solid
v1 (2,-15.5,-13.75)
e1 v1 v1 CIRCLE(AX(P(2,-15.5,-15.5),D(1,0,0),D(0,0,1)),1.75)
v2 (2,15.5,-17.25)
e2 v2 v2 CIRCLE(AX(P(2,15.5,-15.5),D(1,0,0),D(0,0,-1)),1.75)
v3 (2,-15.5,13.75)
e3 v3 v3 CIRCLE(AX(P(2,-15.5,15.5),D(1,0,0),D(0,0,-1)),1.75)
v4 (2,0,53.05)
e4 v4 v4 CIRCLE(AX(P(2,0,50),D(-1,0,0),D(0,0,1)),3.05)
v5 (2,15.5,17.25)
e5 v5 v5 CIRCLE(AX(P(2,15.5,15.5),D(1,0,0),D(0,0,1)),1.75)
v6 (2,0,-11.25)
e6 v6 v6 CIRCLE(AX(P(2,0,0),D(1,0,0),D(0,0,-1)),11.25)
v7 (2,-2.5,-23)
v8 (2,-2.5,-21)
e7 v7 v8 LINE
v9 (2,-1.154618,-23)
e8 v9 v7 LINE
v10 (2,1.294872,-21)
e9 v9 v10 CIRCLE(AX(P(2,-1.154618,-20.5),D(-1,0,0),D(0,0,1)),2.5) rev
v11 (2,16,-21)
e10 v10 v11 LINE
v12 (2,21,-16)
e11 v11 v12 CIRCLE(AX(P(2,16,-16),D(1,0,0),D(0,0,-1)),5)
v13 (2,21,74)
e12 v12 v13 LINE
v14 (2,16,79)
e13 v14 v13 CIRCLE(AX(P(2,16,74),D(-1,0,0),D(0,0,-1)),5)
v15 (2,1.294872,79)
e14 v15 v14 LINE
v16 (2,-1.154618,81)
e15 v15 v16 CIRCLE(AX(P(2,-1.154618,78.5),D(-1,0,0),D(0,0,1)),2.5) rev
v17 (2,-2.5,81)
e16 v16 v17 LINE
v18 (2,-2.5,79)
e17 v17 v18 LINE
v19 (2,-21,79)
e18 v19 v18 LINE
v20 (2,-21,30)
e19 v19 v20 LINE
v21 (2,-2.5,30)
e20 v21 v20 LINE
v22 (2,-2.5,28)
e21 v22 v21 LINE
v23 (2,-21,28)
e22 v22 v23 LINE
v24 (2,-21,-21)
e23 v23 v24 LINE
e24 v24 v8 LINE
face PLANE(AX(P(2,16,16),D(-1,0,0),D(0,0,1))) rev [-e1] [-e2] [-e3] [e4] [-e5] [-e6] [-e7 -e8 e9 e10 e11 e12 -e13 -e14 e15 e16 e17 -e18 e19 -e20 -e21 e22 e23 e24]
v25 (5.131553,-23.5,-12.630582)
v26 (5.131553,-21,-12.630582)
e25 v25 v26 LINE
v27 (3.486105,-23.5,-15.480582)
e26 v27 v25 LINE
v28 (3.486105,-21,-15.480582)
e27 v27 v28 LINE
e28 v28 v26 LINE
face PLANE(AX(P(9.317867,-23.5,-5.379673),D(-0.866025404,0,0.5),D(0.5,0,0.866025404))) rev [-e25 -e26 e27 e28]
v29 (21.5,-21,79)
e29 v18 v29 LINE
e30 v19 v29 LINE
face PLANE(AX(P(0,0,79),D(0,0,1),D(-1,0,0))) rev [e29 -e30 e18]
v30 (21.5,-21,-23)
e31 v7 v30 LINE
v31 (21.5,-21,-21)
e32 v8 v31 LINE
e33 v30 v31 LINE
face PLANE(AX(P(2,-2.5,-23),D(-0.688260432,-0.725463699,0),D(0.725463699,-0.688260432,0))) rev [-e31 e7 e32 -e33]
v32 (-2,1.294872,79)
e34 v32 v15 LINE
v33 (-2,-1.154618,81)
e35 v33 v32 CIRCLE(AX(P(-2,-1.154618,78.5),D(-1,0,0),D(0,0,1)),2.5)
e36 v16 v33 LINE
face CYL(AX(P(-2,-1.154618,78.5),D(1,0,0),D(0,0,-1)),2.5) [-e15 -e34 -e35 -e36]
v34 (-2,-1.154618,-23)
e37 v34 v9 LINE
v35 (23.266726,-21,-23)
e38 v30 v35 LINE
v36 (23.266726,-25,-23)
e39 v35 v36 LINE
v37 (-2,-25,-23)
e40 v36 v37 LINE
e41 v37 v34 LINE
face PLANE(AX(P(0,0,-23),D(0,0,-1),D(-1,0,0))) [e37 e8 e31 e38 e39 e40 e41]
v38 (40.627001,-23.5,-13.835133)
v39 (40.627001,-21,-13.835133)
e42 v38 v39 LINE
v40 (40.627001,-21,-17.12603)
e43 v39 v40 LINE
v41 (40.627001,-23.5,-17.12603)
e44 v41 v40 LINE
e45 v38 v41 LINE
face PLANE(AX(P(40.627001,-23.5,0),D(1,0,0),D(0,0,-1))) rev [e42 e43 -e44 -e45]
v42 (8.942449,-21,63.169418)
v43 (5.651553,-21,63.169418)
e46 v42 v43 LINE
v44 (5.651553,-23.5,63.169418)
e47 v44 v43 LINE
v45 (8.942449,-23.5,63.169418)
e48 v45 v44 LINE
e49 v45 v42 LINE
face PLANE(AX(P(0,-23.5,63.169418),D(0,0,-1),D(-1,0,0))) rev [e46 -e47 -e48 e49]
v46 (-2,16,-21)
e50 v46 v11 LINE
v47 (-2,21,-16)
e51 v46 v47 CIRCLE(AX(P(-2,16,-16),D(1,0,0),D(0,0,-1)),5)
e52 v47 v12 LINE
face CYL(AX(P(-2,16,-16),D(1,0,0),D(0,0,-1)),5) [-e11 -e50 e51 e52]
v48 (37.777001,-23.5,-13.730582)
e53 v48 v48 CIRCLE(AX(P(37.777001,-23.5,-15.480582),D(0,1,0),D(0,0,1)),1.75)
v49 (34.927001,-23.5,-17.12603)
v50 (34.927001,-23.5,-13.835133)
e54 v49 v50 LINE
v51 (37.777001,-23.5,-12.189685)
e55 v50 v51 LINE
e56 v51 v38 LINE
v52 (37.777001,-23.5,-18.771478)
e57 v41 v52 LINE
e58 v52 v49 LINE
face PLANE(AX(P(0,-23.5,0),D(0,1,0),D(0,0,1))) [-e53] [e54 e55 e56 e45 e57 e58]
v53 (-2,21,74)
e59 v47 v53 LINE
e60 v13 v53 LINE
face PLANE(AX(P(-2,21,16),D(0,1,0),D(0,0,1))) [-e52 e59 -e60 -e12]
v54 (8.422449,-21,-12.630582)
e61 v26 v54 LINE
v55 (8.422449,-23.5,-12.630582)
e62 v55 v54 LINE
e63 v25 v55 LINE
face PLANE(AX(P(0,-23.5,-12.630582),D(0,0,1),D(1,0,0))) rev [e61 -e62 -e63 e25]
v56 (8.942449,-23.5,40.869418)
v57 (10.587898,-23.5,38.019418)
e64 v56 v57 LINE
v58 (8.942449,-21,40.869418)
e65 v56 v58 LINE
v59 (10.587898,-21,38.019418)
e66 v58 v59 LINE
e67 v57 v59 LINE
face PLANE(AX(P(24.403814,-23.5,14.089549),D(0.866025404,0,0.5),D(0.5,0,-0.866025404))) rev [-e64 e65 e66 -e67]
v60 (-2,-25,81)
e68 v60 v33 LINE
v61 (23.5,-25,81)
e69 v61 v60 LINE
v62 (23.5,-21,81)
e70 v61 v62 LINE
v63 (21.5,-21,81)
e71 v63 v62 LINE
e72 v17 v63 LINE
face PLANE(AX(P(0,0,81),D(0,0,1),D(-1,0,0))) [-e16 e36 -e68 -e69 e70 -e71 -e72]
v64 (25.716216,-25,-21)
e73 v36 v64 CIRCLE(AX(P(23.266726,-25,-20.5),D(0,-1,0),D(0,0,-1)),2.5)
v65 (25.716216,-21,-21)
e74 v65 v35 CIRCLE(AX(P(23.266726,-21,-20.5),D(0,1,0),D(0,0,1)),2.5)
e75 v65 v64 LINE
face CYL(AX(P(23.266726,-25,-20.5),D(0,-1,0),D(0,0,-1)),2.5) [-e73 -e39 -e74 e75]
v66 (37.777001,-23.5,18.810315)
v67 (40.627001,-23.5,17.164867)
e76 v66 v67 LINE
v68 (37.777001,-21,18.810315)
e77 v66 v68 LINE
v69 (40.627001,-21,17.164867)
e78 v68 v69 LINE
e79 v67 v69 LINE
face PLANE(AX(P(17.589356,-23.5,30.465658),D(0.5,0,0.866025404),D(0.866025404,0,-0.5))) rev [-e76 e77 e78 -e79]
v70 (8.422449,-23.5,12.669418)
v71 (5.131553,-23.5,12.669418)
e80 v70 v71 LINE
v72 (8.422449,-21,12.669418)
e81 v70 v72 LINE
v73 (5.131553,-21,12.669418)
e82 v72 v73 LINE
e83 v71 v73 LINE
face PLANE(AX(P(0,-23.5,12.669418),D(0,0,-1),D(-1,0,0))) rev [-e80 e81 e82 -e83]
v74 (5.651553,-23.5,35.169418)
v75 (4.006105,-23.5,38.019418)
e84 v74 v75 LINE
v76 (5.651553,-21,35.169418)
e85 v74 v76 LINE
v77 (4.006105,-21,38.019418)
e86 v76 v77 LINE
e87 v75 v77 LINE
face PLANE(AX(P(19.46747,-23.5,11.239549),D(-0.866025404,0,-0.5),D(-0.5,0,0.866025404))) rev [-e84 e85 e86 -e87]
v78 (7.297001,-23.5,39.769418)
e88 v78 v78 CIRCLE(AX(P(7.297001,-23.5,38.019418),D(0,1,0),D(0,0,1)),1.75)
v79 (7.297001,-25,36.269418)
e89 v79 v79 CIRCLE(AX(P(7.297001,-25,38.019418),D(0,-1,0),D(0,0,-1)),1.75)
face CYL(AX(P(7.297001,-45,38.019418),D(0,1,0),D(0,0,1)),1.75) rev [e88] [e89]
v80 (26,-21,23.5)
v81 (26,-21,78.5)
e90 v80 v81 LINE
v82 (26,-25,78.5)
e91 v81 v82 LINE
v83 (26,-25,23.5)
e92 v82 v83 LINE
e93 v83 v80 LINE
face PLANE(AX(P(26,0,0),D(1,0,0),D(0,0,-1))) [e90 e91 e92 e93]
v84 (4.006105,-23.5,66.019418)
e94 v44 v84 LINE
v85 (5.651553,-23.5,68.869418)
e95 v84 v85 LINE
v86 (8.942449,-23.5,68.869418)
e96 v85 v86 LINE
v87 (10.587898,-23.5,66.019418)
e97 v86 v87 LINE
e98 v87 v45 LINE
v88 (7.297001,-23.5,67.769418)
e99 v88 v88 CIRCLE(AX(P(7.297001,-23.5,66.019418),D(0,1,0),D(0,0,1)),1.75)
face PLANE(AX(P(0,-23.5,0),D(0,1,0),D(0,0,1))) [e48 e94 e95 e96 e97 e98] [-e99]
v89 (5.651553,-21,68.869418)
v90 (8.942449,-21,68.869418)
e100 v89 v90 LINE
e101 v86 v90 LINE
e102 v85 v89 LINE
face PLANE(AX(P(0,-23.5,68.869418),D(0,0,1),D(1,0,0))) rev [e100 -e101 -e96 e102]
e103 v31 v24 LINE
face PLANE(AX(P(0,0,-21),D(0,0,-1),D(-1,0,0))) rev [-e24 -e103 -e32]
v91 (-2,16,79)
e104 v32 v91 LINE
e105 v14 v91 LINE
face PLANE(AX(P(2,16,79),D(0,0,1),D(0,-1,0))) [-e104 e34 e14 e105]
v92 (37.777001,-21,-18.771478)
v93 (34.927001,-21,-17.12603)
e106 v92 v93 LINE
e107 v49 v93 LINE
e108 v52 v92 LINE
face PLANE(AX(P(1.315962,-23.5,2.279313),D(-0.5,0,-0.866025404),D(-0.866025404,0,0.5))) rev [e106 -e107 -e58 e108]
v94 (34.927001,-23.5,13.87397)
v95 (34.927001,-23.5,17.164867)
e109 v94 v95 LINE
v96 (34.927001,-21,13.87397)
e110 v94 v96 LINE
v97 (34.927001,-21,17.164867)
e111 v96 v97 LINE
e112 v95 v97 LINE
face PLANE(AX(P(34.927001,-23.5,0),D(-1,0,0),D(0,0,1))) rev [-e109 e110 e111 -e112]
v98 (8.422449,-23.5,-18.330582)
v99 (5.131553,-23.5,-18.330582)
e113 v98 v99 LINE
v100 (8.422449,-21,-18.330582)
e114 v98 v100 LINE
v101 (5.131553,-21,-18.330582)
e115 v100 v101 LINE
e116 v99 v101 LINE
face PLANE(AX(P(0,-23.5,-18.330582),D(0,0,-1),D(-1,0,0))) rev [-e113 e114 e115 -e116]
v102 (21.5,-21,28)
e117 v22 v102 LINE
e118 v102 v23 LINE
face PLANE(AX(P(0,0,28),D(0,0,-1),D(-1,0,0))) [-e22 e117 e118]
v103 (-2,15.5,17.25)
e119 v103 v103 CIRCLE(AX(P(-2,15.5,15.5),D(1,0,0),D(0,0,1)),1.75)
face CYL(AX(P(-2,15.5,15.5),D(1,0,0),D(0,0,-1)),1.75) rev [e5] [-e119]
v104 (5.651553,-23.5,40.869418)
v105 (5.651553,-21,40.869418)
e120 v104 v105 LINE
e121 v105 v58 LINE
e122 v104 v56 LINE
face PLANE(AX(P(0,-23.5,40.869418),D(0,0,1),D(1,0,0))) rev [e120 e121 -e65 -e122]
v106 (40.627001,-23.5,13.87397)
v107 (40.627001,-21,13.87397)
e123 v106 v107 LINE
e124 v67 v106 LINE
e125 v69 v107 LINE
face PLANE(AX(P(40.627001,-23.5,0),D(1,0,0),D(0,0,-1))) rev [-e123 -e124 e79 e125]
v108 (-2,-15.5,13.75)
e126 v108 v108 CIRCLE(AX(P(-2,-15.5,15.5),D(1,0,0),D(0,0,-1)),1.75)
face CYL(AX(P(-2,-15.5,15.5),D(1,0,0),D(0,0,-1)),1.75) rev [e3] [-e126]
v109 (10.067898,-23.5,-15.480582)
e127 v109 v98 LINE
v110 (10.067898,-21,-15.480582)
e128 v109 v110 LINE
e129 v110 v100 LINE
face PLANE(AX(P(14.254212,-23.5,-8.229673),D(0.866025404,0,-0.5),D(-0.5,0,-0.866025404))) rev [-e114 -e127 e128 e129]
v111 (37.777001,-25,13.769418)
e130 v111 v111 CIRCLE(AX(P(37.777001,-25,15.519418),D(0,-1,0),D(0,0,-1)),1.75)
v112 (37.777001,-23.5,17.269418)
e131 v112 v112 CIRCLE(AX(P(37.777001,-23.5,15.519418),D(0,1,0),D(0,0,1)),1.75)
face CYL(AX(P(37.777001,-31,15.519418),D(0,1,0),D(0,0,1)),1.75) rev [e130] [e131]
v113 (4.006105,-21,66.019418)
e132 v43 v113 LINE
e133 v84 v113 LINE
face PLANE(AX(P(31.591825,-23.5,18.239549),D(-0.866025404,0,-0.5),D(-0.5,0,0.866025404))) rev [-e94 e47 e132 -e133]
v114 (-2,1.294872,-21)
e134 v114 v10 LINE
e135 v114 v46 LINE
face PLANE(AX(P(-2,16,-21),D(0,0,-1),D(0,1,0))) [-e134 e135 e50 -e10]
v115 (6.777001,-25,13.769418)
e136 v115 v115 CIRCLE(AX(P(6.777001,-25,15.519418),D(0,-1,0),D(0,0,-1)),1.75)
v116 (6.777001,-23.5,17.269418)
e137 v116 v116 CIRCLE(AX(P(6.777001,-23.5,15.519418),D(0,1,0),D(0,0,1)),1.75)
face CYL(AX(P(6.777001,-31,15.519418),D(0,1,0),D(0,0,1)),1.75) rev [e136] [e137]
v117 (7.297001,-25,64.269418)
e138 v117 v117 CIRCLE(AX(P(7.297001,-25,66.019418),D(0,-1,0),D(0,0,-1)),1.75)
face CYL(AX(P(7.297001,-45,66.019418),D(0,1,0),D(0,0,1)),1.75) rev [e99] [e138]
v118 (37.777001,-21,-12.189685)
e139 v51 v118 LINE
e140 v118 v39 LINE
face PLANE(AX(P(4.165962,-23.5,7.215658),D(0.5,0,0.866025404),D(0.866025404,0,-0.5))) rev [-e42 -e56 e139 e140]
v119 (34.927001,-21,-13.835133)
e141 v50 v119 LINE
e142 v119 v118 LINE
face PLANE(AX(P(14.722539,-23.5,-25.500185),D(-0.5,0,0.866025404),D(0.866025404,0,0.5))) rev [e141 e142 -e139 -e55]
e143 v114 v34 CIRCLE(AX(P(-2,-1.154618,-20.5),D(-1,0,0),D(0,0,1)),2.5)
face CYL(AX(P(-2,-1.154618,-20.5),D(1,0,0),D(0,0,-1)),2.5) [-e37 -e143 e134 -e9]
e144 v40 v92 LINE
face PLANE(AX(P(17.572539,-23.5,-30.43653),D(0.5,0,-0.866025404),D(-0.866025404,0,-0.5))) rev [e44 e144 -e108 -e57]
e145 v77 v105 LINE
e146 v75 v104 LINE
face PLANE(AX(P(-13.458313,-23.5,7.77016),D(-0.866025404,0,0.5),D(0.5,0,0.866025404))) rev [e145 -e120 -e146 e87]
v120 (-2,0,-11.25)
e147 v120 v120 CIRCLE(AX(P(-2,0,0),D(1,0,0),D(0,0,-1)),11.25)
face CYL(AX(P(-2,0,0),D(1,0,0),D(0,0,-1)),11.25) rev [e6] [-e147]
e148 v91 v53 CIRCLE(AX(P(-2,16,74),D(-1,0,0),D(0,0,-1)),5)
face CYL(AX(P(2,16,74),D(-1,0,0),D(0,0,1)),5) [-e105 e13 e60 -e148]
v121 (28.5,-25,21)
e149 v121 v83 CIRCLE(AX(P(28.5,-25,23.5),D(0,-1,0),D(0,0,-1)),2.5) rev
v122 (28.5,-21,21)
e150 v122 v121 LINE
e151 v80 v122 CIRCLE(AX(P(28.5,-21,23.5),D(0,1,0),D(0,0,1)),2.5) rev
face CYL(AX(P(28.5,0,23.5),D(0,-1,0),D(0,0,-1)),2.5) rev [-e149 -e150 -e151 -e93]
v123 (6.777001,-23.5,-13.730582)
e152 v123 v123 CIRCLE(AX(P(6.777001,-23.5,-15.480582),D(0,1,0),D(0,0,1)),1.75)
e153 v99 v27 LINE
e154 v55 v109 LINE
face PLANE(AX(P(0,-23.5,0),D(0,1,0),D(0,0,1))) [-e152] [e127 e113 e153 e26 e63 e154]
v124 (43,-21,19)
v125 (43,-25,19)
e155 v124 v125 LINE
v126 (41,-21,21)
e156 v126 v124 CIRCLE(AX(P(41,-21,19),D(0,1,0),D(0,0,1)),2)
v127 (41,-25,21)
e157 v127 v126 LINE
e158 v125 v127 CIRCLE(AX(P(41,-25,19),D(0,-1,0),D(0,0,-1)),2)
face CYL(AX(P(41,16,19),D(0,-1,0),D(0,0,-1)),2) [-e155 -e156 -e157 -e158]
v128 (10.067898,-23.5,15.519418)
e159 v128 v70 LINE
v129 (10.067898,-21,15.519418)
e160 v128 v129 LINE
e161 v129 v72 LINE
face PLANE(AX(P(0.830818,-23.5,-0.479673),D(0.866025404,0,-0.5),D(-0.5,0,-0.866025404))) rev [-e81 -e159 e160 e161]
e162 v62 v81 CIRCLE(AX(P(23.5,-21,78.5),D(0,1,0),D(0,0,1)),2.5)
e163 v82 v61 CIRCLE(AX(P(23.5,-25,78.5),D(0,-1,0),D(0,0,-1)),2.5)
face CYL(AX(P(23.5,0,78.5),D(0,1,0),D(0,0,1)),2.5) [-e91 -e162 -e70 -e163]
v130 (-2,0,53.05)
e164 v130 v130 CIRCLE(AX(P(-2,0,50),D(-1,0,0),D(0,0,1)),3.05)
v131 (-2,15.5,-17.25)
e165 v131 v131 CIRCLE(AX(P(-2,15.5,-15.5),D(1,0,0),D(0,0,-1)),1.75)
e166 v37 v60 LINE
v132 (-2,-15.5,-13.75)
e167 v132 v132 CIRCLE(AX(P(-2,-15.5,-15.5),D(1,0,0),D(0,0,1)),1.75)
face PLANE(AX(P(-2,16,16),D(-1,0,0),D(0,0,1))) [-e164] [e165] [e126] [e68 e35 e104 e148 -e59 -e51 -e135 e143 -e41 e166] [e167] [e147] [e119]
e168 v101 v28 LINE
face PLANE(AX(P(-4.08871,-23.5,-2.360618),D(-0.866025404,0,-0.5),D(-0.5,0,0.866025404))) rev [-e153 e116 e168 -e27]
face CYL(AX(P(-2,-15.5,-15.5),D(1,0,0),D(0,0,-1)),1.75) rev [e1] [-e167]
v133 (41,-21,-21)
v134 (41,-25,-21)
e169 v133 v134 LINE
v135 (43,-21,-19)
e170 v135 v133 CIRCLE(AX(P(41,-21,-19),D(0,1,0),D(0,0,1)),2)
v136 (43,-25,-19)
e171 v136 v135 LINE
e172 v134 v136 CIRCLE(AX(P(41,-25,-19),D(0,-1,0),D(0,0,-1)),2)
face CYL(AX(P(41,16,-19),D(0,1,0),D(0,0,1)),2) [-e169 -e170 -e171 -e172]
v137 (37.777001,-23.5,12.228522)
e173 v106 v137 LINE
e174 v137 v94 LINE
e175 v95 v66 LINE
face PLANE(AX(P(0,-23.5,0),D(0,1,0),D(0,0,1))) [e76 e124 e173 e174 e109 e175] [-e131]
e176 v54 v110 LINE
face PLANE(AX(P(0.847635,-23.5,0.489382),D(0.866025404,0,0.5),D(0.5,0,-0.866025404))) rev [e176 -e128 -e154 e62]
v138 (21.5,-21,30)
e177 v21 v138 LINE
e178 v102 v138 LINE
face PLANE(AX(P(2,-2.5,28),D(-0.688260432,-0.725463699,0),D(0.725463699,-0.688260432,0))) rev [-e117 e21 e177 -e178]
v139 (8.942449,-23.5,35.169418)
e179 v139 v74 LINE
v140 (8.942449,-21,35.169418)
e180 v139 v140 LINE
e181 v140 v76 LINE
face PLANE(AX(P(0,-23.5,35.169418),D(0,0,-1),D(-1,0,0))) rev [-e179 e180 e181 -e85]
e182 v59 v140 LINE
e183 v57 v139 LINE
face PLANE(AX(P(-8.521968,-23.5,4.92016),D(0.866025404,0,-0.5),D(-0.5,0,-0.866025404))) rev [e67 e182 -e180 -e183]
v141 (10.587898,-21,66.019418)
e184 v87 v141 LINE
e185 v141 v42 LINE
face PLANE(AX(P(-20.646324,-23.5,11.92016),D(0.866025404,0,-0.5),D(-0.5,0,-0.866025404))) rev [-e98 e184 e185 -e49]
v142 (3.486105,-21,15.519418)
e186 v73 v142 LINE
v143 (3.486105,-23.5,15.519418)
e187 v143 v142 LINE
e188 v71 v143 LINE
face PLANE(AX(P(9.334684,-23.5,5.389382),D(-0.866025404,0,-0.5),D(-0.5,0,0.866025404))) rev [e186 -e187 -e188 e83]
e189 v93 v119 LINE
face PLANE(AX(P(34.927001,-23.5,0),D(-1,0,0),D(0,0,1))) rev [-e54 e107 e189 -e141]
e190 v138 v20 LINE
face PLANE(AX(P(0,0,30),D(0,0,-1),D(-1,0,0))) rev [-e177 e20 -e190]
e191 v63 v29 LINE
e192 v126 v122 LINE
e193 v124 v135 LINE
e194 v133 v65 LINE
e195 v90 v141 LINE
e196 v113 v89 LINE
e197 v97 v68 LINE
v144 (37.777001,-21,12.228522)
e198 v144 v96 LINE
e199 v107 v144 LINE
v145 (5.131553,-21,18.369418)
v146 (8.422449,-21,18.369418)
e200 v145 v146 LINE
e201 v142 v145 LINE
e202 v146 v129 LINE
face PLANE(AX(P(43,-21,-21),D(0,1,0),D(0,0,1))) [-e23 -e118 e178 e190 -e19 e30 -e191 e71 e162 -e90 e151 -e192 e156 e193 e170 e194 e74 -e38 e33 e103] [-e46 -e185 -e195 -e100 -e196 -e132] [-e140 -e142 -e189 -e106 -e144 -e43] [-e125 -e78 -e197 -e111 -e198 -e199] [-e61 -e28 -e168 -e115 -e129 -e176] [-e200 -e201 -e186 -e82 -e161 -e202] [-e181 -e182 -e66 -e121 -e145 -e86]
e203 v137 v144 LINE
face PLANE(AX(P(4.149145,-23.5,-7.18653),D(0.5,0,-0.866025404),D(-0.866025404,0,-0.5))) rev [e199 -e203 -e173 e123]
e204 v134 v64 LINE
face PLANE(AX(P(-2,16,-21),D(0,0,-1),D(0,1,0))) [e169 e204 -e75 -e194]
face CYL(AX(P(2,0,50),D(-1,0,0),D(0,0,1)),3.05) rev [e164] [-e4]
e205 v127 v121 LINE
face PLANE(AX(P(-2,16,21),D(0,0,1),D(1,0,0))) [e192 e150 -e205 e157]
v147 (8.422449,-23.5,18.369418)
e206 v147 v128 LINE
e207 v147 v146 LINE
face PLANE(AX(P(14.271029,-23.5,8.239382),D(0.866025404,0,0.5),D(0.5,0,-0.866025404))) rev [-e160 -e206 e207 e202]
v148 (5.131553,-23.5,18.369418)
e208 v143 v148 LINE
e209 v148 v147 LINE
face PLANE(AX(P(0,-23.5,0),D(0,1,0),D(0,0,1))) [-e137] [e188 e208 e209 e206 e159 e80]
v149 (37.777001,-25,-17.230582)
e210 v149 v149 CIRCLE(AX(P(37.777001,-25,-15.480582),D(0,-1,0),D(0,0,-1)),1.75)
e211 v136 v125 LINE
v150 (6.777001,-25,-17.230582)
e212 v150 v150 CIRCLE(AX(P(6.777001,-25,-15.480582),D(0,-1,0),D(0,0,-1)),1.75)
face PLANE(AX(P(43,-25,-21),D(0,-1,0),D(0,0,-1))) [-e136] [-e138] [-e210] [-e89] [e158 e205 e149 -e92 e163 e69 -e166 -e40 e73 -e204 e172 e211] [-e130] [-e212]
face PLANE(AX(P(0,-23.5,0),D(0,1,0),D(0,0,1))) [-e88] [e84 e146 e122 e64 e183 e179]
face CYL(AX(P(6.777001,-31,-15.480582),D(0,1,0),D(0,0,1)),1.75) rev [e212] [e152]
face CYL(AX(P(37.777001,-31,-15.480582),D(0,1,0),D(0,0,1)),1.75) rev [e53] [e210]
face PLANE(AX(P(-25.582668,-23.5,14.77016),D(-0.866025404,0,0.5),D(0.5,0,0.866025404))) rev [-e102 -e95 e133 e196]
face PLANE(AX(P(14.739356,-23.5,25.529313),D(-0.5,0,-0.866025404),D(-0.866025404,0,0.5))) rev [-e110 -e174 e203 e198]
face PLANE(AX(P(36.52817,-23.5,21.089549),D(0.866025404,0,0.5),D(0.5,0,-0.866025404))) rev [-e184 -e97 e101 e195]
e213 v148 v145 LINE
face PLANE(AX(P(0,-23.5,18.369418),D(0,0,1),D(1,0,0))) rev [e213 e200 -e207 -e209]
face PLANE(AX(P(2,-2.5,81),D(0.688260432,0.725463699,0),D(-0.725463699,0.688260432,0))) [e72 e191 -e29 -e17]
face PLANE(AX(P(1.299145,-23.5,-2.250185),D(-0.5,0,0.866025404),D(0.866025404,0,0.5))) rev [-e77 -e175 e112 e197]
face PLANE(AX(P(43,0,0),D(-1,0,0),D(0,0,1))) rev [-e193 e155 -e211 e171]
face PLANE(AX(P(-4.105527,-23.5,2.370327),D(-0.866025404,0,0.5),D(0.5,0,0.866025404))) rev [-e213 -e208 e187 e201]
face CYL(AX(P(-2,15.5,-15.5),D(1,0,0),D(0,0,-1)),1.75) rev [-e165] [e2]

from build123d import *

# Parameters (mm, degrees)
BOSS_EXTRUDE1_DEPTH      = 2
BOSS_EXTRUDE1_DEPTH_BACK = 2
SKETCH1_R                = 1.75
SKETCH1_R_2              = 11.25
SKETCH2_W                = 42
SKETCH2_H                = 4
BOSS_EXTRUDE2_DEPTH      = 45
FILLET4_R                = 2
SKETCH3_R                = 1.75
CUT_EXTRUDE1_DEPTH       = 10
SKETCH3_4_R              = 1.75
CUT_EXTRUDE2_DEPTH       = 2.5
SKETCH10_R               = 3.05
BOSS_EXTRUDE4_DEPTH      = 4
SKETCH11_W               = 58
SKETCH11_H               = 4
BOSS_EXTRUDE5_DEPTH      = 24
SKETCH12_R               = 1.75
CUT_EXTRUDE3_DEPTH       = 24
SKETCH12_3_R             = 1.75
CUT_EXTRUDE4_DEPTH       = 2.5
FILLET5_R                = 2.5
BOSS_EXTRUDE6_DEPTH      = 2
LPATTERN1_COUNT          = 2
LPATTERN1_PITCH          = 51
FILLET6_R                = 2.5
FILLET7_R                = 2.5
FILLET7_OF_MIRROR3_R     = 2.5
SKETCH15_W               = 3.203134656
SKETCH15_H               = 5.191613013
BOSS_EXTRUDE7_DEPTH      = 4
FILLET8_R                = 2.5


with BuildPart() as part:
    # Sketch1 → Boss-Extrude1 (new, two sides: drawn at the far end of the back side and taken through both)
    with BuildSketch(Plane(origin=(0, 0, 0), x_dir=(0, 0, -1), z_dir=(1, 0, 0)).offset(-BOSS_EXTRUDE1_DEPTH_BACK)):
        with BuildLine():
            Line((-16, 21), (16, 21))
            ThreePointArc((16, 21), (19.535533906, 19.535533906), (21, 16))
            Line((21, 16), (21, -21))
            Line((21, -21), (-21, -21))
            Line((-21, -21), (-21, 16))
            ThreePointArc((-21, 16), (-19.535533906, 19.535533906), (-16, 21))
        make_face()
        with Locations((15.5, 15.5)):
            Circle(SKETCH1_R, mode=Mode.SUBTRACT)
        with Locations(Location((-15.5, 15.5, 0), (0, 0, 180))):
            Circle(SKETCH1_R, mode=Mode.SUBTRACT)
        with Locations(Location((15.5, -15.5, 0), (0, 0, 180))):
            Circle(SKETCH1_R, mode=Mode.SUBTRACT)
        with Locations((-15.5, -15.5)):
            Circle(SKETCH1_R, mode=Mode.SUBTRACT)
        Circle(SKETCH1_R_2, mode=Mode.SUBTRACT)
    extrude(amount=BOSS_EXTRUDE1_DEPTH + BOSS_EXTRUDE1_DEPTH_BACK)

    # Sketch2 → Boss-Extrude2 (add)
    with BuildSketch(Plane.ZY.offset(2)):
        with Locations((0, -23)):
            Rectangle(SKETCH2_W, SKETCH2_H)
    extrude(amount=-BOSS_EXTRUDE2_DEPTH)

    # Fillet4
    fillet4_edges = [part.edges().sort_by_distance(p)[0] for p in [
        (43, -23, -21),
        (43, -23, 21),
    ]]
    fillet(fillet4_edges, radius=FILLET4_R)

    # Sketch3 → Cut-Extrude1 (cut)
    with BuildSketch(Plane(origin=(0, -21, 0), x_dir=(1, 0, 0), z_dir=(0, 1, 0))):
        with Locations(Location((37.777001089, 15.480581557, 0), (0, 0, 270))):
            Circle(SKETCH3_R)
        with Locations(Location((37.777001089, -15.519418443, 0), (0, 0, 270))):
            Circle(SKETCH3_R)
        with Locations(Location((6.777001089, -15.519418443, 0), (0, 0, 270))):
            Circle(SKETCH3_R)
        with Locations(Location((6.777001089, 15.480581557, 0), (0, 0, 270))):
            Circle(SKETCH3_R)
    extrude(amount=-CUT_EXTRUDE1_DEPTH, mode=Mode.SUBTRACT)

    # Sketch3<4> → Cut-Extrude2 (cut)
    # profile 1 of 4: a face of its own
    with BuildSketch(Plane(origin=(0, -21, 0), x_dir=(1, 0, 0), z_dir=(0, 1, 0))):
        Polygon((37.777001089, -18.810314977), (40.627001089, -17.16486671), (40.627001089, -13.873970176), (37.777001089, -12.228521908), (34.927001089, -13.873970176), (34.927001089, -17.16486671), align=None)
        with Locations(Location((37.777001089, -15.519418443, 0), (0, 0, 270))):
            Circle(SKETCH3_4_R, mode=Mode.SUBTRACT)
    # profile 2 of 4: a face of its own
    with BuildSketch(Plane(origin=(0, -21, 0), x_dir=(1, 0, 0), z_dir=(0, 1, 0))):
        Polygon((5.131552822, -18.369418443), (8.422449356, -18.369418443), (10.067897623, -15.519418443), (8.422449356, -12.669418443), (5.131552822, -12.669418443), (3.486104555, -15.519418443), align=None)
        with Locations(Location((6.777001089, -15.519418443, 0), (0, 0, 270))):
            Circle(SKETCH3_4_R, mode=Mode.SUBTRACT)
    # profile 3 of 4: a face of its own
    with BuildSketch(Plane(origin=(0, -21, 0), x_dir=(1, 0, 0), z_dir=(0, 1, 0))):
        Polygon((40.627001089, 13.83513329), (40.627001089, 17.126029824), (37.777001089, 18.771478092), (34.927001089, 17.126029824), (34.927001089, 13.83513329), (37.777001089, 12.189685023), align=None)
        with Locations(Location((37.777001089, 15.480581557, 0), (0, 0, 270))):
            Circle(SKETCH3_4_R, mode=Mode.SUBTRACT)
    # profile 4 of 4: a face of its own
    with BuildSketch(Plane(origin=(0, -21, 0), x_dir=(1, 0, 0), z_dir=(0, 1, 0))):
        Polygon((5.131552822, 12.630581557), (8.422449356, 12.630581557), (10.067897623, 15.480581557), (8.422449356, 18.330581557), (5.131552822, 18.330581557), (3.486104555, 15.480581557), align=None)
        with Locations(Location((6.777001089, 15.480581557, 0), (0, 0, 270))):
            Circle(SKETCH3_4_R, mode=Mode.SUBTRACT)
    extrude(amount=-CUT_EXTRUDE2_DEPTH, mode=Mode.SUBTRACT)

    # Sketch10 → Boss-Extrude4 (add)
    with BuildSketch(Plane.ZY.offset(2)):
        with BuildLine():
            Line((16, 21), (21, 21))
            Line((21, 21), (74, 21))
            ThreePointArc((74, 21), (77.535533906, 19.535533906), (79, 16))
            Line((79, 16), (79, -25))
            Line((79, -25), (21, -25))
            Line((21, -25), (21, 16))
            Line((21, 16), (16, 21))
        make_face()
        with Locations((50, 0)):
            Circle(SKETCH10_R, mode=Mode.SUBTRACT)
    extrude(amount=-BOSS_EXTRUDE4_DEPTH)

    # Sketch11 → Boss-Extrude5 (add)
    with BuildSketch(Plane(origin=(2, 0, 0), x_dir=(0, 0, -1), z_dir=(1, 0, 0))):
        with Locations((-50, -23)):
            Rectangle(SKETCH11_W, SKETCH11_H)
    extrude(amount=BOSS_EXTRUDE5_DEPTH)

    # Sketch12 → Cut-Extrude3 (cut)
    with BuildSketch(Plane(origin=(0, -21, 0), x_dir=(1, 0, 0), z_dir=(0, 1, 0))):
        with Locations(Location((7.297001089, -38.019418443, 0), (0, 0, 270))):
            Circle(SKETCH12_R)
        with Locations(Location((7.297001089, -66.019418443, 0), (0, 0, 270))):
            Circle(SKETCH12_R)
    extrude(amount=-CUT_EXTRUDE3_DEPTH, mode=Mode.SUBTRACT)

    # Sketch12<3> → Cut-Extrude4 (cut)
    # profile 1 of 2: a face of its own
    with BuildSketch(Plane(origin=(0, -21, 0), x_dir=(1, 0, 0), z_dir=(0, 1, 0))):
        Polygon((5.651552822, -40.869418443), (8.942449356, -40.869418443), (10.587897623, -38.019418443), (8.942449356, -35.169418443), (5.651552822, -35.169418443), (4.006104555, -38.019418443), align=None)
        with Locations(Location((7.297001089, -38.019418443, 0), (0, 0, 270))):
            Circle(SKETCH12_3_R, mode=Mode.SUBTRACT)
    # profile 2 of 2: a face of its own
    with BuildSketch(Plane(origin=(0, -21, 0), x_dir=(1, 0, 0), z_dir=(0, 1, 0))):
        Polygon((5.651552822, -68.869418443), (8.942449356, -68.869418443), (10.587897623, -66.019418443), (8.942449356, -63.169418443), (5.651552822, -63.169418443), (4.006104555, -66.019418443), align=None)
        with Locations(Location((7.297001089, -66.019418443, 0), (0, 0, 270))):
            Circle(SKETCH12_3_R, mode=Mode.SUBTRACT)
    extrude(amount=-CUT_EXTRUDE4_DEPTH, mode=Mode.SUBTRACT)

    # Fillet5
    fillet5_edges = [part.edges().sort_by_distance(p)[0] for p in [
        (26, -23, 21),
        (26, -23, 79),
    ]]
    fillet(fillet5_edges, radius=FILLET5_R)

    # Sketch14 → Boss-Extrude6 (add)
    with BuildSketch(Plane(origin=(0, 0, -21), x_dir=(-1, 0, 0), z_dir=(0, 0, -1))):
        Polygon((-2, -2.5), (-21.5, -21), (-25.716216216, -21), (-25.716216216, -25), (2, -25), (2, 1.294871795), (-2, 1.294871795), align=None)
    boss_extrude6 = extrude(amount=BOSS_EXTRUDE6_DEPTH)

    # LPattern1: Boss-Extrude6 ×2
    with Locations(*[(0, 0, i * LPATTERN1_PITCH) for i in range(1, LPATTERN1_COUNT)]):
        add(boss_extrude6)

    # Fillet6
    # the kernel refuses this fillet: 2.5 mm, written as the material it takes off along each edge
    with BuildSketch(Plane(origin=(25.716216216, -14.876275643, -23), x_dir=(-1, 0, 0), z_dir=(0, -1, 0))) as fillet6_piece_1:
        with BuildLine():
            CenterArc((2.449489743, -2.5), FILLET6_R, 90, 78.463040967)
            Line((0, -2), (-0.048989795, -1.99))
            ThreePointArc((-0.048989795, -1.99), (-0.05, -1), (-0.05, 0))
            Line((-0.05, 0), (0, 0.05))
            Line((0, 0.05), (2.449489743, 0.05))
            Line((2.449489743, 0.05), (2.449489743, 0))
        make_face()
    extrude(amount=16.247448714, mode=Mode.SUBTRACT)

    # Fillet7
    # the kernel refuses this fillet: 2.5 mm, written as the material it takes off along each edge
    with BuildSketch(Plane(origin=(-8.123724357, 1.294871795, -23), x_dir=(0, -1, 0), z_dir=(1, 0, 0))) as fillet7_piece_1:
        with BuildLine():
            CenterArc((2.449489743, -2.5), FILLET7_R, 90, 78.463040967)
            Line((0, -2), (-0.048989795, -1.99))
            ThreePointArc((-0.048989795, -1.99), (-0.05, -1), (-0.05, 0))
            Line((-0.05, 0), (0, 0.05))
            Line((0, 0.05), (2.449489743, 0.05))
            Line((2.449489743, 0.05), (2.449489743, 0))
        make_face()
    extrude(amount=16.247448714, mode=Mode.SUBTRACT)

    # Mirror3: Boss-Extrude6 across plane
    add(boss_extrude6.mirror(Plane.XY.offset(29)))

    # Fillet7 of Mirror3
    # the kernel refuses this fillet: 2.5 mm, written as the material it takes off along each edge
    with BuildSketch(Plane(origin=(-8.123724357, 1.294871795, 81), x_dir=(0, -1.5735190928007313e-12, -1.0), z_dir=(1, 0, 0))) as fillet7_of_mirror3_piece_1:
        with BuildLine():
            CenterArc((2.5, -2.449489743), FILLET7_OF_MIRROR3_R, 101.536959033, 78.463040967)
            Line((0, -2.449489743), (-0.05, -2.449489743))
            Line((-0.05, -2.449489743), (-0.05, 0))
            Line((-0.05, 0), (0, 0.05))
            ThreePointArc((0, 0.05), (1, 0.05), (1.99, 0.048989795))
            Line((1.99, 0.048989795), (2, 0))
        make_face()
    extrude(amount=16.247448714, mode=Mode.SUBTRACT)

    # Sketch15 → Boss-Extrude7 (add)
    with BuildSketch(Plane(origin=(0, -21, 0), x_dir=(1, 0, 0), z_dir=(0, 1, 0))):
        with Locations((24.398432672, -78.404193494)):
            Rectangle(SKETCH15_W, SKETCH15_H)
    extrude(amount=-BOSS_EXTRUDE7_DEPTH)

    # Fillet8
    fillet8_edges = [part.edges().sort_by_distance(p)[0] for p in [
        (26, -23, 81),
    ]]
    fillet(fillet8_edges, radius=FILLET8_R)


solid = part.part
